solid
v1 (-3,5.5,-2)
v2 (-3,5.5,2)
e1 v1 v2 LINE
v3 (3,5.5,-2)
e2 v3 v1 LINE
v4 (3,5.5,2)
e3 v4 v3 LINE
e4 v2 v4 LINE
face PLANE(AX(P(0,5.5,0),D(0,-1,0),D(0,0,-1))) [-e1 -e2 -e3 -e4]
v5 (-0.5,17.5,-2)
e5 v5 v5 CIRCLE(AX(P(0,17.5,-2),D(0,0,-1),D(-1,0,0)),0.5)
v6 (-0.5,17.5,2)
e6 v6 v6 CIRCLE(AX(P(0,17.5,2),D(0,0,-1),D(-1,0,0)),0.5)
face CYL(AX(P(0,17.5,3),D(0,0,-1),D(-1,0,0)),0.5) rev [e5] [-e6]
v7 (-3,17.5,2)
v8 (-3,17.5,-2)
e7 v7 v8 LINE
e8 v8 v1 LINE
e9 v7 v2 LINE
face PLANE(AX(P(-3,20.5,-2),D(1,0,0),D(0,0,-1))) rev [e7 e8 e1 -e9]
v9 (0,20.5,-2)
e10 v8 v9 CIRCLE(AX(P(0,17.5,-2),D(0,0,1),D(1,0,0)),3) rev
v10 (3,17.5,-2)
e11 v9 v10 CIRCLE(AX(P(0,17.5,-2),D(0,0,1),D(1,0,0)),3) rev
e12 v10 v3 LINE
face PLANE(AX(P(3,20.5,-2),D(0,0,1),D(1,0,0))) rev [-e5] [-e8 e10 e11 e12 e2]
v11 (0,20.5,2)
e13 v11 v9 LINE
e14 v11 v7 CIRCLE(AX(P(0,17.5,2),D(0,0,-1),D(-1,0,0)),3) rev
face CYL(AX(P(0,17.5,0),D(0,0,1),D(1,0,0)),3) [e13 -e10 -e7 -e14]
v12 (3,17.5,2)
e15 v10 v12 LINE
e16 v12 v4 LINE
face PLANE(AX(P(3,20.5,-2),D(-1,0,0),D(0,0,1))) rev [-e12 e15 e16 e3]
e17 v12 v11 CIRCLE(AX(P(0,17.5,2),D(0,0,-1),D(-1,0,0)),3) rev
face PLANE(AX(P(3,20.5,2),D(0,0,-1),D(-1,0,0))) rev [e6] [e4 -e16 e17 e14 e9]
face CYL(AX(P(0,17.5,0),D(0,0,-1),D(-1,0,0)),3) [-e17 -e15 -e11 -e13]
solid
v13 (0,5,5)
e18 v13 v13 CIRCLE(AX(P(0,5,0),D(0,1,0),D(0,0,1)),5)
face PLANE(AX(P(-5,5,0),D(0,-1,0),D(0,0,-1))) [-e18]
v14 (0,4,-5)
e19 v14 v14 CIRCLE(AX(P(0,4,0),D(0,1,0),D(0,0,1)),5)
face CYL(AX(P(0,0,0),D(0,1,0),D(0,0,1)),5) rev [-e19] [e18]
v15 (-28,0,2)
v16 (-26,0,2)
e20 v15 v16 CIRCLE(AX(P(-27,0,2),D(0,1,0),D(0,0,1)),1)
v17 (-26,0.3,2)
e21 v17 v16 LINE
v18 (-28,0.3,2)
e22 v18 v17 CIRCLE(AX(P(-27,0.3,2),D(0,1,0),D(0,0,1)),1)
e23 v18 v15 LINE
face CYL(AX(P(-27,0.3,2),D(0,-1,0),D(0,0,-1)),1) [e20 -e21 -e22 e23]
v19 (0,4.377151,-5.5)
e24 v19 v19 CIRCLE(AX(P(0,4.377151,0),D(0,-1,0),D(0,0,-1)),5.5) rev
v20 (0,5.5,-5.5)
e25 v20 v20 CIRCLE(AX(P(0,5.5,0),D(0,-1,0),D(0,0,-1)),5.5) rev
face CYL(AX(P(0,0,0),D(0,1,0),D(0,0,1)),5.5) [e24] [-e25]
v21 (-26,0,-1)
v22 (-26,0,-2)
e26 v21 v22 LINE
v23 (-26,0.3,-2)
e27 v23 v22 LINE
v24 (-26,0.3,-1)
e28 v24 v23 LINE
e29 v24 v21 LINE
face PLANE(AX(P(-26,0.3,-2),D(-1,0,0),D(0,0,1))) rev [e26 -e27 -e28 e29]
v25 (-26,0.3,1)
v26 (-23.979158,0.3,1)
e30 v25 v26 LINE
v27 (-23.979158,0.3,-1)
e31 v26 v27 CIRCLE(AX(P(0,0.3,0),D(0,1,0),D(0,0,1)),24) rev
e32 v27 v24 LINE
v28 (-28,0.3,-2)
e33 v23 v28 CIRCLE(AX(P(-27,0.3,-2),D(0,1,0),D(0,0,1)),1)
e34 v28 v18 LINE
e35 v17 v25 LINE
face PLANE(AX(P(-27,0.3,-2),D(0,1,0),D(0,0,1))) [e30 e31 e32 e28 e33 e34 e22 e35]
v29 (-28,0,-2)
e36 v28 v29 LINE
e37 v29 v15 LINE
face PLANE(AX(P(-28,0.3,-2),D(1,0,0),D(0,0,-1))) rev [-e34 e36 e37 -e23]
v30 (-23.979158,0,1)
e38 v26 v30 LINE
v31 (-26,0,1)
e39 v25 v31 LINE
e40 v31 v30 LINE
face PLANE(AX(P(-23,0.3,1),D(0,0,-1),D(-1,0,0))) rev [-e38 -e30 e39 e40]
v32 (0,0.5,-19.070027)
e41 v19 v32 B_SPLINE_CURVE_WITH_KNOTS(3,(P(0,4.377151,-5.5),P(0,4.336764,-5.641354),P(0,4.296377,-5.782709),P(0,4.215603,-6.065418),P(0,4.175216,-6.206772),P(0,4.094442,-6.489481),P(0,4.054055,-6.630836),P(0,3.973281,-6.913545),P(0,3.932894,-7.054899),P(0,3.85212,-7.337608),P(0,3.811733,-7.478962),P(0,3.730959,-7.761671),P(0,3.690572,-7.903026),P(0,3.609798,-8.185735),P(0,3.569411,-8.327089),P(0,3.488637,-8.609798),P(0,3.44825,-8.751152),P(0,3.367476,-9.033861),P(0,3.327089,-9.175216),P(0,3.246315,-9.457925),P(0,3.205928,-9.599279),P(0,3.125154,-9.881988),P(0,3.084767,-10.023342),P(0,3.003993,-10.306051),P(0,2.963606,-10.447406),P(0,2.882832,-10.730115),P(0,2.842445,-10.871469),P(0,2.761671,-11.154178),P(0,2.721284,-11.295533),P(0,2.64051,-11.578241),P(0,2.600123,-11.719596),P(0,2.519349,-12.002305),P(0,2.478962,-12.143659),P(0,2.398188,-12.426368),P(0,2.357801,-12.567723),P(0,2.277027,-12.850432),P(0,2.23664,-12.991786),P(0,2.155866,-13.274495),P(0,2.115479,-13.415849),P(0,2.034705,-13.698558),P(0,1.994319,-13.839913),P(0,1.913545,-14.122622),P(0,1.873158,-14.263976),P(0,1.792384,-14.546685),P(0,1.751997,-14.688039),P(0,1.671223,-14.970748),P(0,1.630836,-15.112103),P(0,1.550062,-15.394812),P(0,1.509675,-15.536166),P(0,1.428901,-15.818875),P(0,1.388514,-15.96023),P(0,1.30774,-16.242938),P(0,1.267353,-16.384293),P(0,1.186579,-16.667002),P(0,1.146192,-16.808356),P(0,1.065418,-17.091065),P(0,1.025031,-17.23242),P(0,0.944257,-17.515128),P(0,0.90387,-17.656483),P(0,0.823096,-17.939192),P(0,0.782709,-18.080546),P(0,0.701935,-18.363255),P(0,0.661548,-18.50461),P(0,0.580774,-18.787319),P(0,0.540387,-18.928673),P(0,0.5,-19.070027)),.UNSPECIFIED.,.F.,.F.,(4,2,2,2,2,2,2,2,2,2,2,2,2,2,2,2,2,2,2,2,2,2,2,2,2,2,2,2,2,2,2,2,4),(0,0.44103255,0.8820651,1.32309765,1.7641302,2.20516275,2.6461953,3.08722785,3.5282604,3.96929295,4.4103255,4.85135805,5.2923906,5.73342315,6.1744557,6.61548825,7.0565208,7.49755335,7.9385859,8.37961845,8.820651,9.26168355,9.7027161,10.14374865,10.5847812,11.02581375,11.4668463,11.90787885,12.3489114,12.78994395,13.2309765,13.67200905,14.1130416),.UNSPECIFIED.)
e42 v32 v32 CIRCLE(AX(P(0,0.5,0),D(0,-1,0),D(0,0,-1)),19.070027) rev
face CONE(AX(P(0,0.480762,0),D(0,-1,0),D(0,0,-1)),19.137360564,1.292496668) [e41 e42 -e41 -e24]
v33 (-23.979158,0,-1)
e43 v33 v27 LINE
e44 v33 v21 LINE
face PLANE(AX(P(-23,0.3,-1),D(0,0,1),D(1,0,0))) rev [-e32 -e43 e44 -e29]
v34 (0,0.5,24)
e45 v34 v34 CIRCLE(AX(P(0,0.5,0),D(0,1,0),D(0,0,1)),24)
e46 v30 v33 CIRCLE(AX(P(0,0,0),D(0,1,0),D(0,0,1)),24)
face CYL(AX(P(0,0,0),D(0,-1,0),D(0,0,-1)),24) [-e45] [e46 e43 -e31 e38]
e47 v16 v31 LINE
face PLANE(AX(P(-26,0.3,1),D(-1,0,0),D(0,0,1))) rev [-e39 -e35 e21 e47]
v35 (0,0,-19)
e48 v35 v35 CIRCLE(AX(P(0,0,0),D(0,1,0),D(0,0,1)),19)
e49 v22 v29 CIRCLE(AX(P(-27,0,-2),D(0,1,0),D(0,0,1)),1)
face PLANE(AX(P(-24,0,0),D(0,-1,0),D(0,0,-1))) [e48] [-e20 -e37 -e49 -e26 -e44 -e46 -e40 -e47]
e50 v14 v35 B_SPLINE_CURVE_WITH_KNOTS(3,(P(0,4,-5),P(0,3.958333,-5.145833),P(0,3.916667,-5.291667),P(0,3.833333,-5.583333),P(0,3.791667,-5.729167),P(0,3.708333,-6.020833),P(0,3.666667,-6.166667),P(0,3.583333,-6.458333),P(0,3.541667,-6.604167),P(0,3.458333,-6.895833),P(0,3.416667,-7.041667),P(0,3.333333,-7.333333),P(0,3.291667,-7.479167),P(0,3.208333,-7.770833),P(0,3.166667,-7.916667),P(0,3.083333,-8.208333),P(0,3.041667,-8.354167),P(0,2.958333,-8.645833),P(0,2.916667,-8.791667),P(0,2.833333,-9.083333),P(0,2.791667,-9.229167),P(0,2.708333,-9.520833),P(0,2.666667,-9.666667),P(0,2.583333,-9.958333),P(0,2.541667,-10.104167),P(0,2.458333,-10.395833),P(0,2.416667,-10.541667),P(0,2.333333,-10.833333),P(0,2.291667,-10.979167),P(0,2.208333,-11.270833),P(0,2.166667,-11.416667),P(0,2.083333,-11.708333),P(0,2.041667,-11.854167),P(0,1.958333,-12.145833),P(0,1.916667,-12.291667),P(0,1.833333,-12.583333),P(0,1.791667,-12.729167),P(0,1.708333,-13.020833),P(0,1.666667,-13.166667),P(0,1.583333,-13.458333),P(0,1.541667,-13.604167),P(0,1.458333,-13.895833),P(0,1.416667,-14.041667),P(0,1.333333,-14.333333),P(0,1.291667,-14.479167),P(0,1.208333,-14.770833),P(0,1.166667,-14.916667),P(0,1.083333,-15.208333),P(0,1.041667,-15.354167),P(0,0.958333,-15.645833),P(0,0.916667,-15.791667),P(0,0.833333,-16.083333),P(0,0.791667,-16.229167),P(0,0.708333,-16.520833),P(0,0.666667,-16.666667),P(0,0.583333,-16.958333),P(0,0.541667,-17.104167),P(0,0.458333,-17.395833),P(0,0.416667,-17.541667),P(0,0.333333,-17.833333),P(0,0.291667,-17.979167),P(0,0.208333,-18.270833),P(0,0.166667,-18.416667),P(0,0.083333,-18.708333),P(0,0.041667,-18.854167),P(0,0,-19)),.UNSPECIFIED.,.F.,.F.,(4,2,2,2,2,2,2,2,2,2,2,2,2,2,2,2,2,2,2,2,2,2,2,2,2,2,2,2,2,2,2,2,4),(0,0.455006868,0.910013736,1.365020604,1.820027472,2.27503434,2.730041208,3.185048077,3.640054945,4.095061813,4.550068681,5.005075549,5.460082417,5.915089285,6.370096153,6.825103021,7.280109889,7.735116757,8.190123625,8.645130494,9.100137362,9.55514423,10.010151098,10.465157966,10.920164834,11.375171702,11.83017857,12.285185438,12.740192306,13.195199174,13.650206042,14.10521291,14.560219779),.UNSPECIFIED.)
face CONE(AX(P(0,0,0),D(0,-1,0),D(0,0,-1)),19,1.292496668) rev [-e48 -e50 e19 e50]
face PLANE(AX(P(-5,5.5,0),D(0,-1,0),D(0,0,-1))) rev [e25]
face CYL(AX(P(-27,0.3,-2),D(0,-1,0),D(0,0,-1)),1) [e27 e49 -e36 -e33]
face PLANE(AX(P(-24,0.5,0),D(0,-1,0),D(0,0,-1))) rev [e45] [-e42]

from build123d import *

# Parameters (mm, degrees)
PAD_THICKEN_T1        = 0.5
PLUNGER_PROFILE_W     = 6
PLUNGER_PROFILE_H     = 4
PLUNGER_EXTRUDE_DEPTH = 15
PLUNGER_FILLET_R      = 3
PIN_HOLE_PROFILE_R    = 0.5
PIN_HOLE_CUT_DEPTH    = 5
TAG_EXTRUDE_DEPTH     = 0.3


with BuildPart() as body_1:
    # Pad Surface Revolve: a surface, the sketch's curves turned about an axis
    with BuildLine(Plane.XY, mode=Mode.PRIVATE) as pad_surface_revolve_1_path:
        Line((-24, 0), (-19, 0))
        Line((-19, 0), (-5, 4))
        Line((-5, 4), (-5, 5))
        Line((-5, 5), (0, 5))
    pad_surface_revolve_1 = Shell.revolve(pad_surface_revolve_1_path.wire(), 360, Axis((0, 0, 0), (0, 1, 0)))
    add(Solid.thicken(pad_surface_revolve_1, PAD_THICKEN_T1))

    # Tag Profile → Tag Extrude (add)
    with BuildSketch(Plane(origin=(0, 0, 0), x_dir=(1, 0, 0), z_dir=(0, 1, 0))):
        with BuildLine():
            Line((-26, 2), (-26, 1))
            Line((-26, 1), (-23, 1))
            Line((-23, 1), (-23, -1))
            Line((-23, -1), (-26, -1))
            Line((-26, -1), (-26, -2))
            ThreePointArc((-26, -2), (-27, -3), (-28, -2))
            Line((-28, -2), (-28, 2))
            ThreePointArc((-28, 2), (-27, 3), (-26, 2))
        make_face()
    extrude(amount=TAG_EXTRUDE_DEPTH)


with BuildPart() as body_2:
    # Plunger Profile → Plunger Extrude (new body)
    with BuildSketch(Plane(origin=(0, 5.5, 0), x_dir=(1, 0, 0), z_dir=(0, 1, 0))):
        Rectangle(PLUNGER_PROFILE_W, PLUNGER_PROFILE_H)
    extrude(amount=PLUNGER_EXTRUDE_DEPTH)

    # Plunger Fillet
    plunger_fillet_edges = [body_2.edges().sort_by_distance(p)[0] for p in [
        (-3, 20.5, 0),
        (3, 20.5, 0),
    ]]
    fillet(plunger_fillet_edges, radius=PLUNGER_FILLET_R - 0.0001)  # a hair under: the kernel refuses the full size

    # Pin Hole Profile → Pin Hole Cut (cut)
    with BuildSketch(Plane(origin=(0, 0, -2), x_dir=(-1, 0, 0), z_dir=(0, 0, -1))):
        with Locations((0, 17.5)):
            Circle(PIN_HOLE_PROFILE_R)
    extrude(amount=-PIN_HOLE_CUT_DEPTH, mode=Mode.SUBTRACT)


solid = Compound([body_1.part, body_2.part])
